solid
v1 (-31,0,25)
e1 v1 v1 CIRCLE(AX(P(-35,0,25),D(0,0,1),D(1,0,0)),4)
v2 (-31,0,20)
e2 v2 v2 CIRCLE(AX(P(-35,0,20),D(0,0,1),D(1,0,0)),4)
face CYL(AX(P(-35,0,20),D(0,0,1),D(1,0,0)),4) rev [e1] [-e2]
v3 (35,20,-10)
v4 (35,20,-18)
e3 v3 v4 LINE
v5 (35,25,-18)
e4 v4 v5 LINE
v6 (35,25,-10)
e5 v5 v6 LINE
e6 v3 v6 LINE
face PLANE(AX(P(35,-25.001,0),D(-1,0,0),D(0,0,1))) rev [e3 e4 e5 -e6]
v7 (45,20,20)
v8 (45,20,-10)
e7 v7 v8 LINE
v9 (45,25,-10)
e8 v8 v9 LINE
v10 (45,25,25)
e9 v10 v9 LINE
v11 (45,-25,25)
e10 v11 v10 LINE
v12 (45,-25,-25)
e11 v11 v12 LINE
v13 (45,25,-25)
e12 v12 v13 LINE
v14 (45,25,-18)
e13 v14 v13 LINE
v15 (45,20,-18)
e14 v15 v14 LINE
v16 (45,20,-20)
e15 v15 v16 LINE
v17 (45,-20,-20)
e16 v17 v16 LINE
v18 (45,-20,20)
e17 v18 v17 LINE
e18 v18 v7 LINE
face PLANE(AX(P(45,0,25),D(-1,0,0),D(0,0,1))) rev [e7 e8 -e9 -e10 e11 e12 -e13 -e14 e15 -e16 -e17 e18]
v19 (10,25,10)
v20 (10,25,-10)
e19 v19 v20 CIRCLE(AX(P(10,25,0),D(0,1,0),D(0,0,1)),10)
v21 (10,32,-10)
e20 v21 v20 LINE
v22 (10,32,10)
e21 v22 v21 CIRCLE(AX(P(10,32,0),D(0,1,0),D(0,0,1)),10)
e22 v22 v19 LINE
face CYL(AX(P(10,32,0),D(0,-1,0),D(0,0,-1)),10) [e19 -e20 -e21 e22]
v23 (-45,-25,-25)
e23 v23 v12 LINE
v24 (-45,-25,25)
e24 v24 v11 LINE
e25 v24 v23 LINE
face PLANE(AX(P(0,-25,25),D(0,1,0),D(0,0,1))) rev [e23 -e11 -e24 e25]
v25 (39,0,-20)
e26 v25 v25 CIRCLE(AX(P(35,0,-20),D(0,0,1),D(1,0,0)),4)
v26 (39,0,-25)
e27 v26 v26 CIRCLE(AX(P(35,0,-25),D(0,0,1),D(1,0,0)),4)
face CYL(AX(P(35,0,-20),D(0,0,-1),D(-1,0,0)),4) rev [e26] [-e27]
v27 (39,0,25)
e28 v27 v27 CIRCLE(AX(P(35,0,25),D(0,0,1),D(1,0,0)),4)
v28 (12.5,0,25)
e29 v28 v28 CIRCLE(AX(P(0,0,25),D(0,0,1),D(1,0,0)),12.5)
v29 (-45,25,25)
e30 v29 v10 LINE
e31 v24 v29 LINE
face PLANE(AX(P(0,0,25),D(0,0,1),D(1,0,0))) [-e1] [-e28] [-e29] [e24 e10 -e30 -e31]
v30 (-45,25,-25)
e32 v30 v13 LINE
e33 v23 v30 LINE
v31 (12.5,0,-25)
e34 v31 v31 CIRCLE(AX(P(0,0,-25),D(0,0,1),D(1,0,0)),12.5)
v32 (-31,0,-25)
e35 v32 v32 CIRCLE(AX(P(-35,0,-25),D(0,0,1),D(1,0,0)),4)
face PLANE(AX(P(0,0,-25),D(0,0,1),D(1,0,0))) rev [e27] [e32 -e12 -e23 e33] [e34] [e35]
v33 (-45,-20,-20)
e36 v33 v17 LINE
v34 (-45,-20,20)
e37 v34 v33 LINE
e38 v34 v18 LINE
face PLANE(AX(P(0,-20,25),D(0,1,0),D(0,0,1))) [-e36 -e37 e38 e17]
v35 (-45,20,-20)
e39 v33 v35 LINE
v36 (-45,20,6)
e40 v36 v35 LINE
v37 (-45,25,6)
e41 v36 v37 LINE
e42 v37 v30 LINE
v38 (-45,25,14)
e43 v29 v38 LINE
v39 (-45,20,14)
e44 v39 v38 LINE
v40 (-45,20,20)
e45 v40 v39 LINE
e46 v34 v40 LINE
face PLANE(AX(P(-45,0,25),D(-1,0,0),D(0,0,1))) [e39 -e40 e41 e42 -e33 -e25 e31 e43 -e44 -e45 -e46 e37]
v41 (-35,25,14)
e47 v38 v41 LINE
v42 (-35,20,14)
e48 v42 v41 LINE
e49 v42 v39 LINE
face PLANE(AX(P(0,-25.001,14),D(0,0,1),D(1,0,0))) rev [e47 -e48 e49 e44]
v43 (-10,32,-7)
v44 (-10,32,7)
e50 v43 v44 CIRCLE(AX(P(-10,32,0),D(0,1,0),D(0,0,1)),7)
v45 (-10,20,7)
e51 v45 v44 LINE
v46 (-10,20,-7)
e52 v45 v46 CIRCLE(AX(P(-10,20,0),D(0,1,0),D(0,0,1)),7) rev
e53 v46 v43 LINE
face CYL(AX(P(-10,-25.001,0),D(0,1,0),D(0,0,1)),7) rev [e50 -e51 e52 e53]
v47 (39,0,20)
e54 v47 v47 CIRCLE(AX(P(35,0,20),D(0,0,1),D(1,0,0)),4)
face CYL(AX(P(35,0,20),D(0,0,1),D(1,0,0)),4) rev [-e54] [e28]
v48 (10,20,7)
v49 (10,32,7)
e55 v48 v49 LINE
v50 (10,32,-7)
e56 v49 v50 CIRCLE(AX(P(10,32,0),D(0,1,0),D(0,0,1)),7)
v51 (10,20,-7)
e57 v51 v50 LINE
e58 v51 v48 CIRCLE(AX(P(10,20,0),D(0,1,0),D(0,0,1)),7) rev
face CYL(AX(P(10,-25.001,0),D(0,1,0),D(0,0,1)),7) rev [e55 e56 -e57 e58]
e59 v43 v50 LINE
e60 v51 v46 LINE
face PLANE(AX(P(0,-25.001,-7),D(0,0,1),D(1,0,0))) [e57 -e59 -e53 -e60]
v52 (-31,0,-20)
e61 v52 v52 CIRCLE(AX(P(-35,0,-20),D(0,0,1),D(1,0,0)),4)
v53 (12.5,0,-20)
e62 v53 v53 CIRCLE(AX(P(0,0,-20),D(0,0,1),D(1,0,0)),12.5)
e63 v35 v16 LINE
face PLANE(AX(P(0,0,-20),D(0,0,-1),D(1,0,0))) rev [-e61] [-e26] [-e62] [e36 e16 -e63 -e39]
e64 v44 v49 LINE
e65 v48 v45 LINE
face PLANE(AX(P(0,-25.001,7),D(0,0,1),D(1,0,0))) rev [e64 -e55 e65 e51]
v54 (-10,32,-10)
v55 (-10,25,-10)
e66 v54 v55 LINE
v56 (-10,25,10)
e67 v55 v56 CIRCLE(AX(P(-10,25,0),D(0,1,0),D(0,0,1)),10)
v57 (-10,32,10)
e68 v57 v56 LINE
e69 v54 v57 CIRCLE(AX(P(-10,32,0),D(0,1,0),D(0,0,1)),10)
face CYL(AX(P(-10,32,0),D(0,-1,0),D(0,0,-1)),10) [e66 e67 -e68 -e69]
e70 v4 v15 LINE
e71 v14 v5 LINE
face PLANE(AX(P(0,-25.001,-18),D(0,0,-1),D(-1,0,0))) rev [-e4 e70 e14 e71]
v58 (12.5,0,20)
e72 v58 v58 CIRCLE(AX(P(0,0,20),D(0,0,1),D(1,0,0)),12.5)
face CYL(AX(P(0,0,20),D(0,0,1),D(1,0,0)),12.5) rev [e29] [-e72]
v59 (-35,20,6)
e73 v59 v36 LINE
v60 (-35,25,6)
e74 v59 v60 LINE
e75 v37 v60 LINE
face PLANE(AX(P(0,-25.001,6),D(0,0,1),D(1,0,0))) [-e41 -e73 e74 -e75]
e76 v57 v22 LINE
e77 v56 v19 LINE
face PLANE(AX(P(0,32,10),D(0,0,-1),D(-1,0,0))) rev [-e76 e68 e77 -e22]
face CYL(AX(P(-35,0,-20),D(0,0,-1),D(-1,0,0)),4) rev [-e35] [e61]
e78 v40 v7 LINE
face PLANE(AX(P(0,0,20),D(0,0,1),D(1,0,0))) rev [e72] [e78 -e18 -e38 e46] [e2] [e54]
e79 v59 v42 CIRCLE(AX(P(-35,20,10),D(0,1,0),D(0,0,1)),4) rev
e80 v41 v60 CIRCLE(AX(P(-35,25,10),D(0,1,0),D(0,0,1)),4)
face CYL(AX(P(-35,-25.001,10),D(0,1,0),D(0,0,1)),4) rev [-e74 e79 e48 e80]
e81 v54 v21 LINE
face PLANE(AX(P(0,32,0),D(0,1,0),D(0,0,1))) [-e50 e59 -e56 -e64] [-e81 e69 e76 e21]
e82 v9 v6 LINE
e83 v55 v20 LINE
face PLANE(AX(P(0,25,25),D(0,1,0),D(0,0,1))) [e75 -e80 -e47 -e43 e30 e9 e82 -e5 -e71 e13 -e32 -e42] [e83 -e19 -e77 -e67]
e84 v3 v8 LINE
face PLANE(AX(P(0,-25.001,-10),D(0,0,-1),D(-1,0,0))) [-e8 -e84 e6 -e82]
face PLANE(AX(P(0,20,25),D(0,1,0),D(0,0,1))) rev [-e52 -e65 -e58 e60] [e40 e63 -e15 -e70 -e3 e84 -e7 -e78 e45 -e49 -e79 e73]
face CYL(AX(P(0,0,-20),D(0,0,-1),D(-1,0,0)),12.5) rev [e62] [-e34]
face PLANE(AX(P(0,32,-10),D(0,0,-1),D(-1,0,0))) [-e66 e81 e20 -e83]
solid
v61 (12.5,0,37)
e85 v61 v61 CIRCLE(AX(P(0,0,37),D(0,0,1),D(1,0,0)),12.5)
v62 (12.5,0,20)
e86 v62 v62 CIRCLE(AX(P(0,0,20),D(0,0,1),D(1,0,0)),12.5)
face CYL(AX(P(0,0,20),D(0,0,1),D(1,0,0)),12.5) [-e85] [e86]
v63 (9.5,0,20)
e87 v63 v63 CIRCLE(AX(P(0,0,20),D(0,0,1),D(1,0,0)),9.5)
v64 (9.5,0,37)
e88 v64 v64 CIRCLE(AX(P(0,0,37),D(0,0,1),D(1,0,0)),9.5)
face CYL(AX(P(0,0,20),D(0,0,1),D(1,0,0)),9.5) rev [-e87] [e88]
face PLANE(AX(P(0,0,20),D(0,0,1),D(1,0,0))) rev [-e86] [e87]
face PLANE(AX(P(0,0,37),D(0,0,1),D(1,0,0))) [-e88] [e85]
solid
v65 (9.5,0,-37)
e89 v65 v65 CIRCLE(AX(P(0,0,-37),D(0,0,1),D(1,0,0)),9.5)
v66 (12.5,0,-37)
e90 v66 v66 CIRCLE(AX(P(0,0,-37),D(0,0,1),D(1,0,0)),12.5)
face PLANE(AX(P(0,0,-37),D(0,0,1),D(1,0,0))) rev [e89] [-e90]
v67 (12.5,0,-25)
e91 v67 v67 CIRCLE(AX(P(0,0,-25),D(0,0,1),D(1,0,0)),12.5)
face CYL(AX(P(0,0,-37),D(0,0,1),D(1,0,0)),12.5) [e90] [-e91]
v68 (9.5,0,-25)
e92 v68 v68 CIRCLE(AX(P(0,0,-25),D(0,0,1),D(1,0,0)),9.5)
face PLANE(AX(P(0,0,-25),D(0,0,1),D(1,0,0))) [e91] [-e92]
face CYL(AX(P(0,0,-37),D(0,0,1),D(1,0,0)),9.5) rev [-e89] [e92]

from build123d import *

# Parameters (mm, degrees)
SKETCH1_W                = 90
SKETCH1_H                = 5
BOSS_EXTRUDE1_DEPTH      = 25
BOSS_EXTRUDE1_2_DEPTH    = 25
EXTRUDE_START            = 25
SKETCH1_3_W              = 80
SKETCH1_3_H              = 40
SKETCH1_3_R              = 4
SKETCH1_3_R_2            = 12.5
EXTRUDE_S_DEPTH          = 5
BOSS_EXTRUDE3_DEPTH      = 12
BOSS_EXTRUDE3_DEPTH_BACK = 5
BOSS_EXTRUDE3_START      = 25
SKETCH1_4_R              = 12.5
SKETCH1_4_R_2            = 9.5
BOSS_EXTRUDE4_START      = 20
BOSS_EXTRUDE4_OUTLINE_W  = 5
BOSS_EXTRUDE4_OUTLINE_H  = 40
BOSS_EXTRUDE4_DEPTH      = 5
BOSS_EXTRUDE5_START      = -25
SKETCH1_6_R              = 12.5
SKETCH1_6_R_2            = 9.5
BOSS_EXTRUDE5_DEPTH      = 12
SKETCH2_W                = 10
SKETCH2_H                = 8
CUT_EXTRUDE1_DEPTH       = 5
BOSS_EXTRUDE6_START      = 7
BOSS_EXTRUDE6_DEPTH      = 7


# Read off the part's stored shape, not the designer's step: Boss-Extrude4
with BuildPart() as part:
    # Sketch1 → Boss-Extrude1 (new, symmetric)
    with BuildSketch(Plane.XY):
        with Locations((0, -22.5)):
            Rectangle(SKETCH1_W, SKETCH1_H)
    extrude(amount=BOSS_EXTRUDE1_DEPTH, both=True)

    # Sketch1<3> → s (add)
    with BuildSketch(Plane.XY.offset(EXTRUDE_START)):
        Rectangle(SKETCH1_3_W, SKETCH1_3_H)
        with Locations((-35, 0)):
            Circle(SKETCH1_3_R, mode=Mode.SUBTRACT)
        Circle(SKETCH1_3_R_2, mode=Mode.SUBTRACT)
        with Locations((35, 0)):
            Circle(SKETCH1_3_R, mode=Mode.SUBTRACT)
    extrude_s = extrude(amount=-EXTRUDE_S_DEPTH)



with BuildPart() as body_2:
    # Sketch1 → Boss-Extrude1 2 (new, symmetric)
    with BuildSketch(Plane.XY):
        with Locations((0, 22.5)):
            Rectangle(SKETCH1_W, SKETCH1_H)
    extrude(amount=BOSS_EXTRUDE1_2_DEPTH, both=True)


with BuildPart() as body_3:
    # Sketch1<4> → Boss-Extrude3 (new, two sides: drawn at the far end of the back side and taken through both)
    with BuildSketch(Plane.XY.offset(BOSS_EXTRUDE3_START - BOSS_EXTRUDE3_DEPTH_BACK)):
        Circle(SKETCH1_4_R)
        Circle(SKETCH1_4_R_2, mode=Mode.SUBTRACT)
    extrude(amount=BOSS_EXTRUDE3_DEPTH + BOSS_EXTRUDE3_DEPTH_BACK)


with BuildPart() as part_1:
    add(part.part)

    add(body_2.part)  # Boss-Extrude4 merges body 2
    # Boss-Extrude4 outline → Boss-Extrude4 (add)
    with BuildSketch(Plane.XY.offset(BOSS_EXTRUDE4_START)):
        with Locations((-42.5, 0)):
            Rectangle(BOSS_EXTRUDE4_OUTLINE_W, BOSS_EXTRUDE4_OUTLINE_H)
        with Locations((42.5, 0)):
            Rectangle(BOSS_EXTRUDE4_OUTLINE_W, BOSS_EXTRUDE4_OUTLINE_H)
    boss_extrude4 = extrude(amount=BOSS_EXTRUDE4_DEPTH)

    # Mirror3: s, Boss-Extrude4 across plane
    add(extrude_s.mirror(Plane.XY))
    add(boss_extrude4.mirror(Plane.XY))

    # Sketch2 → Cut-Extrude1 (cut)
    with BuildSketch(Plane(origin=(0, 25, 0), x_dir=(1, 0, 0), z_dir=(0, 1, 0))):
        with BuildLine():
            Line((-35, -6), (-45, -6))
            Line((-45, -6), (-45, -14))
            Line((-45, -14), (-35, -14))
            ThreePointArc((-35, -14), (-31, -10), (-35, -6))
        make_face()
        with Locations((40, 14)):
            Rectangle(SKETCH2_W, SKETCH2_H)
        with BuildLine():
            Line((-10, 7), (10, 7))
            ThreePointArc((10, 7), (17, 0), (10, -7))
            Line((10, -7), (-10, -7))
            ThreePointArc((-10, -7), (-17, 0), (-10, 7))
        make_face()
    extrude(amount=-CUT_EXTRUDE1_DEPTH, mode=Mode.SUBTRACT)

    # Sketch2<3> → Boss-Extrude6 (add)
    with BuildSketch(Plane(origin=(0, 25, 0), x_dir=(1, 0, 0), z_dir=(0, 1, 0)).offset(BOSS_EXTRUDE6_START)):
        with BuildLine():
            Line((-10, -10), (10, -10))
            ThreePointArc((10, -10), (20, 0), (10, 10))
            Line((10, 10), (-10, 10))
            ThreePointArc((-10, 10), (-20, 0), (-10, -10))
        make_face()
        with BuildLine():
            ThreePointArc((-10, 7), (-17, 0), (-10, -7))
            Line((-10, -7), (10, -7))
            ThreePointArc((10, -7), (17, 0), (10, 7))
            Line((10, 7), (-10, 7))
        make_face(mode=Mode.SUBTRACT)
    extrude(amount=-BOSS_EXTRUDE6_DEPTH)


with BuildPart() as body_3_2:
    # Sketch1<6> → Boss-Extrude5 (new body)
    with BuildSketch(Plane.XY.offset(BOSS_EXTRUDE5_START)):
        Circle(SKETCH1_6_R)
        Circle(SKETCH1_6_R_2, mode=Mode.SUBTRACT)
    extrude(amount=-BOSS_EXTRUDE5_DEPTH)


solid = Compound([body_3.part, part_1.part, body_3_2.part])
